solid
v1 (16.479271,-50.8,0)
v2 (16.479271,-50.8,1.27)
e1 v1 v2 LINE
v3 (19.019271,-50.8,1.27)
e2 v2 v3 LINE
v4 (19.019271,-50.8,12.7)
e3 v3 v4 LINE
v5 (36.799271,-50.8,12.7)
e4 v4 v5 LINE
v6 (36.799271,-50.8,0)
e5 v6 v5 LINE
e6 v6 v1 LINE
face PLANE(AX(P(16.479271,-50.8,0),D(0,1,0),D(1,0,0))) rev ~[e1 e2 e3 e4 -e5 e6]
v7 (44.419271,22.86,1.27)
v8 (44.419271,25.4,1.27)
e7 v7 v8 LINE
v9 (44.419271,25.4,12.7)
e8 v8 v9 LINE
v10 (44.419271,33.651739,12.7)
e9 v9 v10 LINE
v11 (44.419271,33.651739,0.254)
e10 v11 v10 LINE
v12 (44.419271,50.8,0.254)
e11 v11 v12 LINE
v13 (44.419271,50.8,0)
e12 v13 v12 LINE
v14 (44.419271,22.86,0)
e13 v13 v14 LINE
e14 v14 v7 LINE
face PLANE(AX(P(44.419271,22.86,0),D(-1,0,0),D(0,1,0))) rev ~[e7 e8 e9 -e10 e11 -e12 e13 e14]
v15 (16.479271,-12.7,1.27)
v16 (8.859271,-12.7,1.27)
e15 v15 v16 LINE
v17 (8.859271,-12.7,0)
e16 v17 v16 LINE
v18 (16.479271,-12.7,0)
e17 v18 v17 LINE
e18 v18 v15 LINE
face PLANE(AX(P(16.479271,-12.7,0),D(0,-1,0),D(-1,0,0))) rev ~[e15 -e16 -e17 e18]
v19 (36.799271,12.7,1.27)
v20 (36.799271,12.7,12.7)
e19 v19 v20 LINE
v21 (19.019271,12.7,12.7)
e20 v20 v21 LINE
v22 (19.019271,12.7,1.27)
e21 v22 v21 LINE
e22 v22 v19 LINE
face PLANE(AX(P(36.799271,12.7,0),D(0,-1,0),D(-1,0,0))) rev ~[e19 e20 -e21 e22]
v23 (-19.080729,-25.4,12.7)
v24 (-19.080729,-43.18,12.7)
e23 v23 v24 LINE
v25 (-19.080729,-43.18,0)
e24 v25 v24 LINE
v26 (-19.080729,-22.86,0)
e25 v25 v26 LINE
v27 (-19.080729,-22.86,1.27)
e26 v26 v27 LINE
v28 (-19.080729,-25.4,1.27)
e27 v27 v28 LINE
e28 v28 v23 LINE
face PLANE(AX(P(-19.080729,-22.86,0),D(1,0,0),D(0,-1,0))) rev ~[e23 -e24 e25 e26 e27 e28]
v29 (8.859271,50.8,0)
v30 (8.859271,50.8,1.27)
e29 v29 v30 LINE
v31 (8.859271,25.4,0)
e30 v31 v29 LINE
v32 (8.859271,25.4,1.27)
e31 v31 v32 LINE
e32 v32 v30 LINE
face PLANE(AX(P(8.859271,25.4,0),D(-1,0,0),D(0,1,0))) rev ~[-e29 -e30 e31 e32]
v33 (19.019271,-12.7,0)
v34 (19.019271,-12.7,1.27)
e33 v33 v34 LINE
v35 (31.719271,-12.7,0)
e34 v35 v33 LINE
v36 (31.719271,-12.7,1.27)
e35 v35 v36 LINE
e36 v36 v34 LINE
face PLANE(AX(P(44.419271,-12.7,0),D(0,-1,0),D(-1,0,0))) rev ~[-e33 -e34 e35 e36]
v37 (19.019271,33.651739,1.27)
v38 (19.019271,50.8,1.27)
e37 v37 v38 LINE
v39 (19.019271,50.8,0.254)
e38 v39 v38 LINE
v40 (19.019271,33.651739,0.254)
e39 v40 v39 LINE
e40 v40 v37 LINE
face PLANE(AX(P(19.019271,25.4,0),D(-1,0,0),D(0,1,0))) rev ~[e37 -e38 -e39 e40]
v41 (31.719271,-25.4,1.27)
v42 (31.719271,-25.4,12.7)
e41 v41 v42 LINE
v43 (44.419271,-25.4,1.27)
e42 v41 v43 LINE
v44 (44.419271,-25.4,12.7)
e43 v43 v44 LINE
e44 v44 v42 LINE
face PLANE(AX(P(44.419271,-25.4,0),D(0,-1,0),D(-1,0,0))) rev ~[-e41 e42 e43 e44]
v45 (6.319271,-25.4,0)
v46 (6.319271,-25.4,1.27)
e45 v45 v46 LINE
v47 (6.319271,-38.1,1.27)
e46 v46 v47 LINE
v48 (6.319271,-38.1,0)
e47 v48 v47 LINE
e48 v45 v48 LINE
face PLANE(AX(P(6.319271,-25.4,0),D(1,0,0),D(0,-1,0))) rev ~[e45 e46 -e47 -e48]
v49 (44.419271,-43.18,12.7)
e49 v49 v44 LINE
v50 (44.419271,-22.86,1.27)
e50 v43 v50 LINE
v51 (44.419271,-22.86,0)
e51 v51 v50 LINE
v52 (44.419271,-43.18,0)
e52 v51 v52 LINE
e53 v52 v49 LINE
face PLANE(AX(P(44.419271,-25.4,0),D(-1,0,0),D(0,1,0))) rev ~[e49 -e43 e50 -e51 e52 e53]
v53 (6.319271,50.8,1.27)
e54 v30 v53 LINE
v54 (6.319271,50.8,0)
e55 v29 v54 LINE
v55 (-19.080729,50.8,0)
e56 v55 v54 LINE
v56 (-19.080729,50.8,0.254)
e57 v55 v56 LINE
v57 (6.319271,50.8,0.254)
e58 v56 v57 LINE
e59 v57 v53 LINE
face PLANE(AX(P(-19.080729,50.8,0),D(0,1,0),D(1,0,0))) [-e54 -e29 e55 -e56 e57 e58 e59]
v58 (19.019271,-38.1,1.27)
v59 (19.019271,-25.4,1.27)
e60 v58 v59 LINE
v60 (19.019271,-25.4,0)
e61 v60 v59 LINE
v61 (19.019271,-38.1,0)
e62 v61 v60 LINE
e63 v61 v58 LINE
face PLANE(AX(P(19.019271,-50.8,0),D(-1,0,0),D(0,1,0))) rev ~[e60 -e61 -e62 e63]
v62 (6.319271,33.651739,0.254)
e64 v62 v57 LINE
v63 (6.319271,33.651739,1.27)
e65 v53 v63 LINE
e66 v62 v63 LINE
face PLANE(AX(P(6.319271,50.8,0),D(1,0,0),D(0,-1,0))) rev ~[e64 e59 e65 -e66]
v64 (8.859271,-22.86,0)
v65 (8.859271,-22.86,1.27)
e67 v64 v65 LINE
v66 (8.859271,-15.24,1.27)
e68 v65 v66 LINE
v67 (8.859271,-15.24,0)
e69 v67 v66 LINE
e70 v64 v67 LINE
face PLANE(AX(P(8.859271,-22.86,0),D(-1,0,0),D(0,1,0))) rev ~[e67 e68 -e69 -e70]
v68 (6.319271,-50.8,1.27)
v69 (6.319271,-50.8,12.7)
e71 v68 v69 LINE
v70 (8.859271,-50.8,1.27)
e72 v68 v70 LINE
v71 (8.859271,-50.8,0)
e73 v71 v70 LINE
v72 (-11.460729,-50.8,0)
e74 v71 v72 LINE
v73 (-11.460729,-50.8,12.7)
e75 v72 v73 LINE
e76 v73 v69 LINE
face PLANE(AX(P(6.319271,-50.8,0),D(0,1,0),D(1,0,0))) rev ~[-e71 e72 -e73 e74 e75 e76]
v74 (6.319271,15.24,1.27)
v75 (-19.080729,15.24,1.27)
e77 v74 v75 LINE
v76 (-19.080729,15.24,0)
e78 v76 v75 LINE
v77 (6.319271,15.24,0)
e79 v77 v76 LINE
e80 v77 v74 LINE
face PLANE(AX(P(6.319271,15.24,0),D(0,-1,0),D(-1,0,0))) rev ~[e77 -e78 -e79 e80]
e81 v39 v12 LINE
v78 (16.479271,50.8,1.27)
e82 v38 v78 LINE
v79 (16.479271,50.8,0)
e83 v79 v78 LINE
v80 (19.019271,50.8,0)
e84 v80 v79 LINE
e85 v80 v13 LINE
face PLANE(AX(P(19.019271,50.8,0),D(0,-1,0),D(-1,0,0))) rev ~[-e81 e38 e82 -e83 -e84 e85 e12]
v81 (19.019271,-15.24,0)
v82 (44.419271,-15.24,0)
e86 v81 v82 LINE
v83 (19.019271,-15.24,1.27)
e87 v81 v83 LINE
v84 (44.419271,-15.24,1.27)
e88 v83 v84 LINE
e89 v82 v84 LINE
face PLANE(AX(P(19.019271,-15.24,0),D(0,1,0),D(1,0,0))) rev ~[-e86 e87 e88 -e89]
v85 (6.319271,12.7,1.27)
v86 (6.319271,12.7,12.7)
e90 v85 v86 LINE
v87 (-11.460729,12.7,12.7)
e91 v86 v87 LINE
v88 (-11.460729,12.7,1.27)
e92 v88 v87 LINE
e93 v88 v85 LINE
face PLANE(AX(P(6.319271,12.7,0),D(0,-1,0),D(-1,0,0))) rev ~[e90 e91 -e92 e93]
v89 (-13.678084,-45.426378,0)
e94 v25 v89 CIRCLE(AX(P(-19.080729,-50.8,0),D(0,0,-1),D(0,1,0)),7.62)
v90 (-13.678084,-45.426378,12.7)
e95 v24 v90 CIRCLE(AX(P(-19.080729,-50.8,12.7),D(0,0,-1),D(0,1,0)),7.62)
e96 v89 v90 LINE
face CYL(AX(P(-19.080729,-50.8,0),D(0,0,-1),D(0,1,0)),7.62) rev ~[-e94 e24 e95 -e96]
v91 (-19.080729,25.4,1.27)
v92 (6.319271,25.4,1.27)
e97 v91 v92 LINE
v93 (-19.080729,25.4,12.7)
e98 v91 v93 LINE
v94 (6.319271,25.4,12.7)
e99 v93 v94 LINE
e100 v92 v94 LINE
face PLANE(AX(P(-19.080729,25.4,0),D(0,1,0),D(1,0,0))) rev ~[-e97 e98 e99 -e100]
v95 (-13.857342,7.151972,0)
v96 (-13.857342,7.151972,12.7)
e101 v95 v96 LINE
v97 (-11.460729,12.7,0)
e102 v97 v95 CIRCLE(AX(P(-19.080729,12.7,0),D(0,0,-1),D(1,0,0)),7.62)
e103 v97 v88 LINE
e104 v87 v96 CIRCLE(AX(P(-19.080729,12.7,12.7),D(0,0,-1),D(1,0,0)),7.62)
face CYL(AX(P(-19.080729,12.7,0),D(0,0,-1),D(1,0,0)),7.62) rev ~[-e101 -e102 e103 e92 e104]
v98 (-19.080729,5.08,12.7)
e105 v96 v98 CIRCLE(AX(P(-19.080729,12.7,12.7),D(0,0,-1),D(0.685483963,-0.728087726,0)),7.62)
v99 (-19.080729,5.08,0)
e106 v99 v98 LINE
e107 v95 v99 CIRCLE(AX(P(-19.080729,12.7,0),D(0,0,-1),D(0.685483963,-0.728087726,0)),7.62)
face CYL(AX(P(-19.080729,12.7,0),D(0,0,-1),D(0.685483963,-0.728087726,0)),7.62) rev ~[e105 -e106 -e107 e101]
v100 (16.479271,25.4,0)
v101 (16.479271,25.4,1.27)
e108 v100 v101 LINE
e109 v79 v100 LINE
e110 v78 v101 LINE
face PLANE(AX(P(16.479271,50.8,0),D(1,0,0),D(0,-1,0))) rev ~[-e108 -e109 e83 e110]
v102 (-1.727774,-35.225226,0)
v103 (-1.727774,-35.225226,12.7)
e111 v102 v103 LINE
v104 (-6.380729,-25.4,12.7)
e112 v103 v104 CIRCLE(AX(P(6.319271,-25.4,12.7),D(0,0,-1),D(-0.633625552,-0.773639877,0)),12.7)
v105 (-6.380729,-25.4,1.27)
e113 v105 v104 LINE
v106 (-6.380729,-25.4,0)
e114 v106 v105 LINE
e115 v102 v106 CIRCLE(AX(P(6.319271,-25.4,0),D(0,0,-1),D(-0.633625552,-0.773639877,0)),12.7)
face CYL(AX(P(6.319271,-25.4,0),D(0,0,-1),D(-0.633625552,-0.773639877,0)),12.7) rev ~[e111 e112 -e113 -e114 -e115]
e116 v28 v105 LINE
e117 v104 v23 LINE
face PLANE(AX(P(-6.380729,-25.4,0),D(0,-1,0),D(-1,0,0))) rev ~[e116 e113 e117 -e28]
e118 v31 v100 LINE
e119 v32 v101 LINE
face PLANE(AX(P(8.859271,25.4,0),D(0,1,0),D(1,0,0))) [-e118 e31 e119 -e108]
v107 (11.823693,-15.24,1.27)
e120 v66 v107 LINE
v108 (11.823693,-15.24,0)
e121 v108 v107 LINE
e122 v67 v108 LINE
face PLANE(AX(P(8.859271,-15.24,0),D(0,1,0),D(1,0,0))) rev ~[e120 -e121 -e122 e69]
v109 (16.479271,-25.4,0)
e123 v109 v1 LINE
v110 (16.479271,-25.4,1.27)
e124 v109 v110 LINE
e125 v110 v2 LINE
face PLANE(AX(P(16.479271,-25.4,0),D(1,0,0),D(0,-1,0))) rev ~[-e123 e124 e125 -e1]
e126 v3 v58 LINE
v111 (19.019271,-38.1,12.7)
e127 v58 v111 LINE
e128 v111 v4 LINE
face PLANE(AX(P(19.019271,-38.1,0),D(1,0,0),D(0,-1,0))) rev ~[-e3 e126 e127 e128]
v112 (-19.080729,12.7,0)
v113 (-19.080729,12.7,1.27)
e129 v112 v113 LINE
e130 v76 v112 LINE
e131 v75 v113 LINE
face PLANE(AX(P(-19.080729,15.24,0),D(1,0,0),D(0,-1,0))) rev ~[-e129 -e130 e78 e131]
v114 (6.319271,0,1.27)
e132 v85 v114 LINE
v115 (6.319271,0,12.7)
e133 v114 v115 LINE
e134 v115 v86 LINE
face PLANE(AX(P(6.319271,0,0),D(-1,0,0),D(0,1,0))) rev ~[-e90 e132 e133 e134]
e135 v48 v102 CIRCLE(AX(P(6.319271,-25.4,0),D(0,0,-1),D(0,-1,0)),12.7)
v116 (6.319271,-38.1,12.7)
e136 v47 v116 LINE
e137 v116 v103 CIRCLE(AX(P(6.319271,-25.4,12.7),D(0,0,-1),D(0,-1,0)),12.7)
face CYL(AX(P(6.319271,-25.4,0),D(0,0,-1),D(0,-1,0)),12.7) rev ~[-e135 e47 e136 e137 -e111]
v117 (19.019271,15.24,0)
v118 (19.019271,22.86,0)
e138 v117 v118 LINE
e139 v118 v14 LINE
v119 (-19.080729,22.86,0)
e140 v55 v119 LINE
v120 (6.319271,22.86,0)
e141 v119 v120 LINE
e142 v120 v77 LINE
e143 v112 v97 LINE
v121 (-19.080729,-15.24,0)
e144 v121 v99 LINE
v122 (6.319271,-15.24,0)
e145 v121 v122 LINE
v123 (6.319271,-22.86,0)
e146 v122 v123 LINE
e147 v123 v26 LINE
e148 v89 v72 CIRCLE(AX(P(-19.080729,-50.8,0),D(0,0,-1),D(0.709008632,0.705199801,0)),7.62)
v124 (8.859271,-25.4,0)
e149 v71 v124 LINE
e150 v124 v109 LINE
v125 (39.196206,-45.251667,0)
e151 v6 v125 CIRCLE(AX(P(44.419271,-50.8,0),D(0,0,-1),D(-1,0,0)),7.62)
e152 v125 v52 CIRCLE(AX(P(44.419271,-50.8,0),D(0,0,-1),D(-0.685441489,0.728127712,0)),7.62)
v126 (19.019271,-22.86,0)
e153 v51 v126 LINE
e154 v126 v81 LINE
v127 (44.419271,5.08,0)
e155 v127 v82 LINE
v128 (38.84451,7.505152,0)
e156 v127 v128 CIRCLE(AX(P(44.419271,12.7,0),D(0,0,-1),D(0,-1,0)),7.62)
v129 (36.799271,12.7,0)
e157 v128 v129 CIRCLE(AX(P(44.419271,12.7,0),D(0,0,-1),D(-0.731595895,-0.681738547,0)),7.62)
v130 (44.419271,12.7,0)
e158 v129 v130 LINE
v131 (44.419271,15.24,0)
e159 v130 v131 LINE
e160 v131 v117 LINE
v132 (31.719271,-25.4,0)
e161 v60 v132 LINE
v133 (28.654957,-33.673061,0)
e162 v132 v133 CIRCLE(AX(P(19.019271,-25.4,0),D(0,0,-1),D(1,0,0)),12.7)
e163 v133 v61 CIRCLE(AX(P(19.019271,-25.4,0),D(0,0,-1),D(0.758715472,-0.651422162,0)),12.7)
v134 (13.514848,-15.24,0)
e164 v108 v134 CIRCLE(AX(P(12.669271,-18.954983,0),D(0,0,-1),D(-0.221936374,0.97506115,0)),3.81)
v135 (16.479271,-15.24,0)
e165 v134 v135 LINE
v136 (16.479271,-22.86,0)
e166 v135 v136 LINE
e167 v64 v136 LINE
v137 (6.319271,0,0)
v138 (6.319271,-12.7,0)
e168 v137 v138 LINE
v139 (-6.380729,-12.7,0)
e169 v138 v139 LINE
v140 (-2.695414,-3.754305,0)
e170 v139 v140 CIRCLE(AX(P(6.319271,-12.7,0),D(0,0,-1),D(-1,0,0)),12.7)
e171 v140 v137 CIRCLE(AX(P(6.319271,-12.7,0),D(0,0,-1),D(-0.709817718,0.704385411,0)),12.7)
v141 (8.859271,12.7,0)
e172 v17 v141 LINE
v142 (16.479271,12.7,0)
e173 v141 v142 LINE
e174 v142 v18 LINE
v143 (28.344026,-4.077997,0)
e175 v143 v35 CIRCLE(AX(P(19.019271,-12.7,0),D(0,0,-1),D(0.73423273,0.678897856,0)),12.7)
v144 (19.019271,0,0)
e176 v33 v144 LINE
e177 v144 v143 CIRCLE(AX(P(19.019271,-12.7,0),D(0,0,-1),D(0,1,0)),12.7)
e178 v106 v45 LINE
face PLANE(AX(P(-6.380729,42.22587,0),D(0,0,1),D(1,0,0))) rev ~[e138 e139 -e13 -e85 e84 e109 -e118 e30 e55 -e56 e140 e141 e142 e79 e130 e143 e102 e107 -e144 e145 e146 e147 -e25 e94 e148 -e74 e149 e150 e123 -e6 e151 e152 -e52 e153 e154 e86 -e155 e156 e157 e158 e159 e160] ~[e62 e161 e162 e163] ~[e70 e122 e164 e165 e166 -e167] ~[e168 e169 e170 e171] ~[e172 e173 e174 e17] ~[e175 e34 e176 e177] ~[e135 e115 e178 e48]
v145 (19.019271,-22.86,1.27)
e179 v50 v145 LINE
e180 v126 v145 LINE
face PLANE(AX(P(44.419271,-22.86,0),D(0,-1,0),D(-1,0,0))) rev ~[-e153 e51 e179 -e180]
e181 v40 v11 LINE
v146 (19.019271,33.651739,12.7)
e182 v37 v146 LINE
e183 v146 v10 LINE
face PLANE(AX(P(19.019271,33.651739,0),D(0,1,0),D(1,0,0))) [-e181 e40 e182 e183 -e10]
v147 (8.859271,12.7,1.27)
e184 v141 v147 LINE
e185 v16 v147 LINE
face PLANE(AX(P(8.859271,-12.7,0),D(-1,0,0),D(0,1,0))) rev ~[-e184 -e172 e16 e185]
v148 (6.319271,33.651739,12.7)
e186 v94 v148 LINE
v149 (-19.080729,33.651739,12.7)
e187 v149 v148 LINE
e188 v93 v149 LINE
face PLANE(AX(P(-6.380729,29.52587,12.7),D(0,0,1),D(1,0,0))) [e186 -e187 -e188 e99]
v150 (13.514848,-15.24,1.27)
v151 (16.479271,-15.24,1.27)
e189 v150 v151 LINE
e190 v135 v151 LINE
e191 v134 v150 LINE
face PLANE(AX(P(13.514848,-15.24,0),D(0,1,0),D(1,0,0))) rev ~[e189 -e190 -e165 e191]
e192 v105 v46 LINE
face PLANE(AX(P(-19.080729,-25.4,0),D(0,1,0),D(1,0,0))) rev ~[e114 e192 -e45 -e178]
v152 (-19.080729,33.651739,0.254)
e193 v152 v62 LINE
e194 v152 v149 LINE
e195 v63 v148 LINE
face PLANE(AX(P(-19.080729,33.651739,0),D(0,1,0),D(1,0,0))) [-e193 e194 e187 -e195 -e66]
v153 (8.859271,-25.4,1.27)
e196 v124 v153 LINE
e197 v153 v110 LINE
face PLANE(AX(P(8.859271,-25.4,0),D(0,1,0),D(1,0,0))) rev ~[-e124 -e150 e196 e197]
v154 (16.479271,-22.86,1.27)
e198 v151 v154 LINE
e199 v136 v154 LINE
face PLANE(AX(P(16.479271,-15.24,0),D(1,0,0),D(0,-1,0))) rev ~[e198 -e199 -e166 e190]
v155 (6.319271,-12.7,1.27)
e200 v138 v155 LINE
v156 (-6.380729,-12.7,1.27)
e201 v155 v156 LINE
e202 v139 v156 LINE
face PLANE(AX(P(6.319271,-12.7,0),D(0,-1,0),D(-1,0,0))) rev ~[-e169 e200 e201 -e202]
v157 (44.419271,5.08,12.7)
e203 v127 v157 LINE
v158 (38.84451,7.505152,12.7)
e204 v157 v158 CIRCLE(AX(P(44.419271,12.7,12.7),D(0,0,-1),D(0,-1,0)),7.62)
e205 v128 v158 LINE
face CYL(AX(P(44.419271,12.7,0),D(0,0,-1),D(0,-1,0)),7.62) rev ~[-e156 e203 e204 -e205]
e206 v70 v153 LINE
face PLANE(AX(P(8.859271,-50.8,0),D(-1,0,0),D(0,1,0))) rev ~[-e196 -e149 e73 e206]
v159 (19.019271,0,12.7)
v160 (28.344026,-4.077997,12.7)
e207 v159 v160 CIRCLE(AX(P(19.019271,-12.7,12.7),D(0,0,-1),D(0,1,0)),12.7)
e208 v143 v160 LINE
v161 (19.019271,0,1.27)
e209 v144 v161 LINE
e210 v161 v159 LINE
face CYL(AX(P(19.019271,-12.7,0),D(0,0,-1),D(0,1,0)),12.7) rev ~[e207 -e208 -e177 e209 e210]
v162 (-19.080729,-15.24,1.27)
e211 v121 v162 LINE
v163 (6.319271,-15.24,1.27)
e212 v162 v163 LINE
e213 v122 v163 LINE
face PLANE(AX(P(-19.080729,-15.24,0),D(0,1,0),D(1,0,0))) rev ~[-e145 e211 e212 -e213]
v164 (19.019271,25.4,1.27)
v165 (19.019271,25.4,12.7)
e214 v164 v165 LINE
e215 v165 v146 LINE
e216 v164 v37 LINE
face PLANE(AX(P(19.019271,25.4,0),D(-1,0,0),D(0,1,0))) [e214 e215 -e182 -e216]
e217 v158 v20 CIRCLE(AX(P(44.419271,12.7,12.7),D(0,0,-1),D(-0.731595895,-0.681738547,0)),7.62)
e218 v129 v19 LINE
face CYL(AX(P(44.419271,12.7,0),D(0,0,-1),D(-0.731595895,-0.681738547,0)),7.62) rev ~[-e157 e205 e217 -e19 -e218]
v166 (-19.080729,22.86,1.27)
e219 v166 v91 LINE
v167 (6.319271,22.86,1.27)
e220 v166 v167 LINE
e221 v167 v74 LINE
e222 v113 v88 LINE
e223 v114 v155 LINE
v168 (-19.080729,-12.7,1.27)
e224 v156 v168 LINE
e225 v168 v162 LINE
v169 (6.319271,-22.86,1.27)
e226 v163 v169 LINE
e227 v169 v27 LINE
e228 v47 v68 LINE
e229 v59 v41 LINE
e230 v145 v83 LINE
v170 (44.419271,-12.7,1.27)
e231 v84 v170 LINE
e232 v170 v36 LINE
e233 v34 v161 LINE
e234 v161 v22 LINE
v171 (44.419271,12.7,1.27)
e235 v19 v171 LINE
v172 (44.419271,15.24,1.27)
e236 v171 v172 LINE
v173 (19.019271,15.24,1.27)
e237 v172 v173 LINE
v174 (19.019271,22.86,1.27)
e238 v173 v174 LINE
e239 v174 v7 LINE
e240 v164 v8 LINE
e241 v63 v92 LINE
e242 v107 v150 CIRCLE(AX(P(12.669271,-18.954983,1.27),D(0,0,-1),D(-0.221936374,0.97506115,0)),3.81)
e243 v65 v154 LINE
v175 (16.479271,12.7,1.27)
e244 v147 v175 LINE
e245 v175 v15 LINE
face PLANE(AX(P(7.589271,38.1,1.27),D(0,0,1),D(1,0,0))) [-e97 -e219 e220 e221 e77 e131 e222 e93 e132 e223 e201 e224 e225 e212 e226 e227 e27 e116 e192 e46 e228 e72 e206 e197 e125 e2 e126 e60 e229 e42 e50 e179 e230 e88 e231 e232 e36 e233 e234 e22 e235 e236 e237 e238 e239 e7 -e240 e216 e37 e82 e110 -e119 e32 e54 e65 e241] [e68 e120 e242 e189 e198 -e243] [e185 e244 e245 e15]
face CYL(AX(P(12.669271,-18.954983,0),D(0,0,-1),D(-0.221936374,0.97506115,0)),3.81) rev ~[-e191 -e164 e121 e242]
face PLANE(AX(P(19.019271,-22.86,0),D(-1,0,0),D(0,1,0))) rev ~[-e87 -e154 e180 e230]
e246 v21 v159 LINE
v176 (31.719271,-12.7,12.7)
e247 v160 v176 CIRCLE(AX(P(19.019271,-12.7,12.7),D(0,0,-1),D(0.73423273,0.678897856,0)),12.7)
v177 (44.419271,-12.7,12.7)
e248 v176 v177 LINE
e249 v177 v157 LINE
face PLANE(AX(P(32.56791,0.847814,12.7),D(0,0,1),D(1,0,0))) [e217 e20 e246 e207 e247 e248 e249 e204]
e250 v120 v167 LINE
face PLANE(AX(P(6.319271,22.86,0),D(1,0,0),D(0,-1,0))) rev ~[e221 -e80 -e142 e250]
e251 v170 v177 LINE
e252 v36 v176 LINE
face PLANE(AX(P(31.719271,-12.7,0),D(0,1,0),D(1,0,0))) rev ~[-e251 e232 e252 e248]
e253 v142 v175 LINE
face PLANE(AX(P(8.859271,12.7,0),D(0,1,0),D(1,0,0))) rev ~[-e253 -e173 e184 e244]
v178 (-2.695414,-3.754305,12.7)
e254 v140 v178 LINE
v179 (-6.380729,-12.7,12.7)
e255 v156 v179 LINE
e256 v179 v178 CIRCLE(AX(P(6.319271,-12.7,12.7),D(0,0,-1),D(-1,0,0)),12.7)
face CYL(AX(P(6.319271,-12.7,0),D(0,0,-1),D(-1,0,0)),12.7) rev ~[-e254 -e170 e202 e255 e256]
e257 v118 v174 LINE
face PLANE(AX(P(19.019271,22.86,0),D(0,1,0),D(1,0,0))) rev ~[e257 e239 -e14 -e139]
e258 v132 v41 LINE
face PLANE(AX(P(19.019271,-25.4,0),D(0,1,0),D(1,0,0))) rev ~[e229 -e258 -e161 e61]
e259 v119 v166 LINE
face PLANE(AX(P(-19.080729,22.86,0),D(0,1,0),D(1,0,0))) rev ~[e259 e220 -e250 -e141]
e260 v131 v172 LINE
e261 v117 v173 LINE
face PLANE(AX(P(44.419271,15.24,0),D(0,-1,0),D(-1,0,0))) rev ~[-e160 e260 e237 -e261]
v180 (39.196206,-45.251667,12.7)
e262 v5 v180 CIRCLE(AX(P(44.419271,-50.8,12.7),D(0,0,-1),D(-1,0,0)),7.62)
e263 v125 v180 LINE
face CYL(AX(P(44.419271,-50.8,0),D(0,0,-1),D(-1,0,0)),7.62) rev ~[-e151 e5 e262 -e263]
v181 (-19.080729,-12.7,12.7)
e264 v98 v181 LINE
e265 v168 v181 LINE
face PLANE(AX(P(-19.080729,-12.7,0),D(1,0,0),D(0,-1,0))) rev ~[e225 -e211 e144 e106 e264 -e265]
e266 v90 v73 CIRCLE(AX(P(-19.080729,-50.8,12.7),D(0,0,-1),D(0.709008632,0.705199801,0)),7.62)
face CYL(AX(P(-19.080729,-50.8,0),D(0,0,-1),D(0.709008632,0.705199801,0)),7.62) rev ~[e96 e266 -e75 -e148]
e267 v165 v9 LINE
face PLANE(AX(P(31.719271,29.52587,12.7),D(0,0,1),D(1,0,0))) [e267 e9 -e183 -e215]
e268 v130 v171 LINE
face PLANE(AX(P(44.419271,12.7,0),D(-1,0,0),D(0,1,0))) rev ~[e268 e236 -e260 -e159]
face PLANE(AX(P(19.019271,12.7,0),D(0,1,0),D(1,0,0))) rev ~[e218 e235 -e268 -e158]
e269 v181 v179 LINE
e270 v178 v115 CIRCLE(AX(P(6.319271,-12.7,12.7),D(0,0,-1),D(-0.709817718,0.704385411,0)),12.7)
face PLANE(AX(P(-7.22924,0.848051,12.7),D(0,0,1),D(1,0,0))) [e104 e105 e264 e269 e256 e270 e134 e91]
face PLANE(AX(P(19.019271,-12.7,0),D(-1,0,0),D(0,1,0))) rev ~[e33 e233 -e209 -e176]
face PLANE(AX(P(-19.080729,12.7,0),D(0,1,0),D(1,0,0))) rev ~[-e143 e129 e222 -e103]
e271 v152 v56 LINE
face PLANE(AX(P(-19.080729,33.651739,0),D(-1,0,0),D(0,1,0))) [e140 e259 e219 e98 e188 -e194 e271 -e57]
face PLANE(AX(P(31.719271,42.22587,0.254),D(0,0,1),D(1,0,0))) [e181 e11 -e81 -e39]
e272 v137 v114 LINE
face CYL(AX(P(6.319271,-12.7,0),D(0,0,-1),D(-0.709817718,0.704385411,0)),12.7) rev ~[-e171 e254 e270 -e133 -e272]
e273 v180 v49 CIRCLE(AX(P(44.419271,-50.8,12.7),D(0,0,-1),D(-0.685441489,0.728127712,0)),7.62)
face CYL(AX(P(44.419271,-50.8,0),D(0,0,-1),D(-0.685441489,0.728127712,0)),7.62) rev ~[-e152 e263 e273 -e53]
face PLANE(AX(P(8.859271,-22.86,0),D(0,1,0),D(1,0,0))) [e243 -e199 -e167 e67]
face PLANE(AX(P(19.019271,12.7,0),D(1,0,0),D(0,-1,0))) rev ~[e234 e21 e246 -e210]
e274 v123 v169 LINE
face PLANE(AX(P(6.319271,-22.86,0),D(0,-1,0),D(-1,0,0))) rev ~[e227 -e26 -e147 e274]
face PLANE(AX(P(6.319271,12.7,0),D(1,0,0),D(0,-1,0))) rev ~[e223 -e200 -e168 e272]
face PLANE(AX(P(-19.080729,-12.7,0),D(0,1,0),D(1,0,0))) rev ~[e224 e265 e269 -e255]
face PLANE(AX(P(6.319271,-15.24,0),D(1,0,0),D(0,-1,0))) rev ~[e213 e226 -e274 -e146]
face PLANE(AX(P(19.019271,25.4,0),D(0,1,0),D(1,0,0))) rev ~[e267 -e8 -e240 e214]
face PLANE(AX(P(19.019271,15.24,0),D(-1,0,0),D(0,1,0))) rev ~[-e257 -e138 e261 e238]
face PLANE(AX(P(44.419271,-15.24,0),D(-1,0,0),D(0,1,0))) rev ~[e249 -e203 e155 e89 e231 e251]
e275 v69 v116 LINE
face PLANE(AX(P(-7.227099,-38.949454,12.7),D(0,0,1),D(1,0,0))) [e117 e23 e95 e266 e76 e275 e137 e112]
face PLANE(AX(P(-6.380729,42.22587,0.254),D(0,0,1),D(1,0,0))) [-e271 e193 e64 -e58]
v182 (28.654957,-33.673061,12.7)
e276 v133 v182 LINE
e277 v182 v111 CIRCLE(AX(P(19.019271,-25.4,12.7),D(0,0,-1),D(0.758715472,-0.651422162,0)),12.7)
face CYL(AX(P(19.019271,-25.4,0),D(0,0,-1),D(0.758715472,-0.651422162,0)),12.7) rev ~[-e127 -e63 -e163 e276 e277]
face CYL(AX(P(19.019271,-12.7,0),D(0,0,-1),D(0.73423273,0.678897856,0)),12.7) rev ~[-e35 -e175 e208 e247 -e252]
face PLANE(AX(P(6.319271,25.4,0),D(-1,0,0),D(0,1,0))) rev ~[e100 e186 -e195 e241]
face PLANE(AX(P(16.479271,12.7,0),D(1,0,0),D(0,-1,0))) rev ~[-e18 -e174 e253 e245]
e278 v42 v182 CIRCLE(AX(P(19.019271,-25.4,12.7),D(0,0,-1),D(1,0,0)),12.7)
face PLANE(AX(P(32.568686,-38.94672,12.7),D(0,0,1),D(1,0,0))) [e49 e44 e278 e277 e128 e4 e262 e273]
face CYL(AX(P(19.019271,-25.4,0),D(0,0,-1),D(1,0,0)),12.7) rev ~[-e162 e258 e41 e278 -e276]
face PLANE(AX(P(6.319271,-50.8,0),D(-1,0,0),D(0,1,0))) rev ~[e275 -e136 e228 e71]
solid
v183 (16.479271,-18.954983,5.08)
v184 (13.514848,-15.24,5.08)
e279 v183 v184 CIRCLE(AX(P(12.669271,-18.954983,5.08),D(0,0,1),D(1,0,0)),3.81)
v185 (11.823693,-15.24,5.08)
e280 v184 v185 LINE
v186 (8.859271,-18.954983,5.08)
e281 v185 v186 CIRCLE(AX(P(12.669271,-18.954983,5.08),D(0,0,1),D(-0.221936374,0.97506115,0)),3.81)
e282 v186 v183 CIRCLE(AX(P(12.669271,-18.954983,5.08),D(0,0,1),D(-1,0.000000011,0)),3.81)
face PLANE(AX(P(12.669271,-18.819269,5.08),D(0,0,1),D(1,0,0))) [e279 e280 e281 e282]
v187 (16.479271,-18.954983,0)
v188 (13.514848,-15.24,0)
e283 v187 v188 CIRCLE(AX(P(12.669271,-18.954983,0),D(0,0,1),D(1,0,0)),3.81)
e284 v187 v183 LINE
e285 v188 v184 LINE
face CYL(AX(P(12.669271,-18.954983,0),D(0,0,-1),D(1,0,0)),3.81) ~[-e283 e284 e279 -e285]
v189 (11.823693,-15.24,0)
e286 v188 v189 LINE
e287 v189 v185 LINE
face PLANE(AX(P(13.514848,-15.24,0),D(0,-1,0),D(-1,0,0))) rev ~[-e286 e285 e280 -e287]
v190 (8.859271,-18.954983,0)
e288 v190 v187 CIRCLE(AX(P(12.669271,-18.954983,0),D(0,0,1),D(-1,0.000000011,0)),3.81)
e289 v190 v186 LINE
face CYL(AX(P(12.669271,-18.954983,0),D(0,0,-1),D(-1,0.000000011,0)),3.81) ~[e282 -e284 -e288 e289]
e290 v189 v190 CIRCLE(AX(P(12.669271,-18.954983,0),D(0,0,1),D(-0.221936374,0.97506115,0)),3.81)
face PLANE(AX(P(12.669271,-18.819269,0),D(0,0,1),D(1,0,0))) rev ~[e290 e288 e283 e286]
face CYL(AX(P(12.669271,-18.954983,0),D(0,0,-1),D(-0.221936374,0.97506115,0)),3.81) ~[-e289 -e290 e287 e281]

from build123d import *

# Parameters (mm, degrees)
F1_DEPTH = 5.08
F0_W     = 7.62
F0_H     = 7.62
F0_H_2   = 2.54
F0_W_2   = 2.54
F0_W_3   = 25.4
F2_DEPTH = 1.27
F0_H_3   = 8.2517393589
F3_DEPTH = 12.7
F0_H_4   = 17.1482606411
F4_DEPTH = 0.254


with BuildPart() as f1:
    # F0 (on Top) → F1 (new body)
    with BuildSketch(Plane.XY):
        with BuildLine():
            ThreePointArc((11.8236929674, -15.24), (9.6912048674, -16.5785939593), (8.8592705512, -18.954982938))
            ThreePointArc((8.8592705512, -18.954982938), (12.6692705296, -22.7649829811), (16.4792705512, -18.9549829811))
            ThreePointArc((16.4792705512, -18.9549829811), (15.6473362485, -16.5785939761), (13.514848135, -15.24))
            Line((13.514848135, -15.24), (11.8236929674, -15.24))
        make_face()
    extrude(amount=F1_DEPTH)


with BuildPart() as f2:
    # F0 (on Top) → F2 (new body)
    with BuildSketch(Plane.XY):
        Polygon((8.8592705512, 50.8), (6.3192705512, 50.8), (6.3192705512, 33.6517393589), (6.3192705512, 25.4), (8.8592705512, 25.4), align=None)
        Polygon((16.4792705512, 50.8), (16.4792705512, 25.4), (19.0192705512, 25.4), (19.0192705512, 33.6517393589), (19.0192705512, 50.8), align=None)
        with Locations((12.6692705512, 19.05)):
            Rectangle(F0_W, F0_H)
        with Locations((12.6692705512, 24.13)):
            Rectangle(F0_W, F0_H_2)
        with Locations((7.5892705512, 24.13)):
            Rectangle(F0_W_2, F0_H_2)
        with Locations((-6.3807294488, 24.13)):
            Rectangle(F0_W_3, F0_H_2)
        with Locations((7.5892705512, 19.05)):
            Rectangle(F0_W_2, F0_H)
        with Locations((17.7492705512, 19.05)):
            Rectangle(F0_W_2, F0_H)
        with Locations((31.7192705512, 24.13)):
            Rectangle(F0_W_3, F0_H_2)
        with Locations((17.7492705512, 24.13)):
            Rectangle(F0_W_2, F0_H_2)
        Polygon((44.4192705512, 15.24), (19.0192705512, 15.24), (19.0192705512, 12.7), (36.7992705512, 12.7), (44.4192705512, 12.7), align=None)
        with Locations((17.7492705512, 13.97)):
            Rectangle(F0_W_2, F0_H_2)
        with Locations((7.5892705512, 13.97)):
            Rectangle(F0_W_2, F0_H_2)
        Polygon((6.3192705512, 12.7), (6.3192705512, 15.24), (-19.0807294488, 15.24), (-19.0807294488, 12.7), (-11.4607294488, 12.7), align=None)
        with Locations((12.6692705512, 13.97)):
            Rectangle(F0_W, F0_H_2)
        Polygon((8.8592705512, 12.7), (6.3192705512, 12.7), (6.3192705512, 0), (6.3192705512, -12.7), (8.8592705512, -12.7), align=None)
        Polygon((19.0192705512, 12.7), (16.4792705512, 12.7), (16.4792705512, -12.7), (19.0192705512, -12.7), (19.0192705512, 0), align=None)
        Polygon((6.3192705512, -15.24), (6.3192705512, -12.7), (-6.3807294488, -12.7), (-19.0807294488, -12.7), (-19.0807294488, -15.24), align=None)
        with Locations((7.5892705512, -13.97)):
            Rectangle(F0_W_2, F0_H_2)
        with BuildLine():
            Line((16.4792705512, -12.7), (8.8592705512, -12.7))
            Line((8.8592705512, -12.7), (8.8592705512, -15.24))
            Line((8.8592705512, -15.24), (11.8236929674, -15.24))
            ThreePointArc((11.8236929674, -15.24), (12.6692705512, -15.1449829811), (13.514848135, -15.24))
            Line((13.514848135, -15.24), (16.4792705512, -15.24))
            Line((16.4792705512, -15.24), (16.4792705512, -12.7))
        make_face()
        with Locations((17.7492705512, -13.97)):
            Rectangle(F0_W_2, F0_H_2)
        Polygon((31.7192705512, -12.7), (19.0192705512, -12.7), (19.0192705512, -15.24), (44.4192705512, -15.24), (44.4192705512, -12.7), align=None)
        Polygon((19.0192705512, -15.24), (16.4792705512, -15.24), (16.4792705512, -18.9549829811), (16.4792705512, -22.86), (19.0192705512, -22.86), align=None)
        Polygon((8.8592705512, -18.954982938), (8.8592705512, -15.24), (6.3192705512, -15.24), (6.3192705512, -22.86), (8.8592705512, -22.86), align=None)
        with Locations((12.6692705512, -24.13)):
            Rectangle(F0_W, F0_H_2)
        with Locations((7.5892705512, -24.13)):
            Rectangle(F0_W_2, F0_H_2)
        Polygon((6.3192705512, -25.4), (6.3192705512, -22.86), (-19.0807294488, -22.86), (-19.0807294488, -25.4), (-6.3807294488, -25.4), align=None)
        Polygon((44.4192705512, -22.86), (19.0192705512, -22.86), (19.0192705512, -25.4), (31.7192705512, -25.4), (44.4192705512, -25.4), align=None)
        with Locations((17.7492705512, -24.13)):
            Rectangle(F0_W_2, F0_H_2)
        Polygon((19.0192705512, -25.4), (16.4792705512, -25.4), (16.4792705512, -50.8), (19.0192705512, -50.8), (19.0192705512, -38.1), align=None)
        Polygon((8.8592705512, -25.4), (6.3192705512, -25.4), (6.3192705512, -38.1), (6.3192705512, -50.8), (8.8592705512, -50.8), align=None)
    extrude(amount=F2_DEPTH)

    # F0 (on Top) → F3 (join)
    with BuildSketch(Plane.XY):
        with Locations((-6.3807294488, 29.5258696795)):
            Rectangle(F0_W_3, F0_H_3)
        with Locations((31.7192705512, 29.5258696795)):
            Rectangle(F0_W_3, F0_H_3)
        with BuildLine():
            Line((6.3192705512, 0), (6.3192705512, 12.7))
            Line((6.3192705512, 12.7), (-11.4607294488, 12.7))
            ThreePointArc((-11.4607294488, 12.7), (-12.0854948202, 9.6782302386), (-13.8573416512, 7.151971529))
            ThreePointArc((-13.8573416512, 7.151971529), (-16.2710654964, 5.6169082687), (-19.0807294488, 5.08))
            Line((-19.0807294488, 5.08), (-19.0807294488, -12.7))
            Line((-19.0807294488, -12.7), (-6.3807294488, -12.7))
            ThreePointArc((-6.3807294488, -12.7), (-5.4233122083, -7.8624644563), (-2.6954144666, -3.7543052797))
            ThreePointArc((-2.6954144666, -3.7543052797), (1.4366648405, -0.9760859149), (6.3192705512, 0))
        make_face()
        with BuildLine():
            Line((36.7992705512, 12.7), (19.0192705512, 12.7))
            Line((19.0192705512, 12.7), (19.0192705512, 0))
            ThreePointArc((19.0192705512, 0), (24.108011302, -1.0640764195), (28.34402622, -4.0779972329))
            ThreePointArc((28.34402622, -4.0779972329), (30.8453941129, -8.0704426234), (31.7192705512, -12.7))
            Line((31.7192705512, -12.7), (44.4192705512, -12.7))
            Line((44.4192705512, -12.7), (44.4192705512, 5.08))
            ThreePointArc((44.4192705512, 5.08), (41.3795616585, 5.7125419609), (38.8445098324, 7.505152271))
            ThreePointArc((38.8445098324, 7.505152271), (37.3289928177, 9.9085198082), (36.7992705512, 12.7))
        make_face()
        with BuildLine():
            Line((44.4192705512, -25.4), (31.7192705512, -25.4))
            ThreePointArc((31.7192705512, -25.4), (30.9285782234, -29.8111665996), (28.6549570442, -33.6730614532))
            ThreePointArc((28.6549570442, -33.6730614532), (24.3212569499, -36.9403180298), (19.0192705512, -38.1))
            Line((19.0192705512, -38.1), (19.0192705512, -50.8))
            Line((19.0192705512, -50.8), (36.7992705512, -50.8))
            ThreePointArc((36.7992705512, -50.8), (37.4241240621, -47.7780262087), (39.1962064031, -45.2516668355))
            ThreePointArc((39.1962064031, -45.2516668355), (41.6098131938, -43.7168263217), (44.4192705512, -43.18))
            Line((44.4192705512, -43.18), (44.4192705512, -25.4))
        make_face()
        with BuildLine():
            ThreePointArc((-1.7277739655, -35.2252264374), (-5.1586967201, -30.8356478288), (-6.3807294488, -25.4))
            Line((-6.3807294488, -25.4), (-19.0807294488, -25.4))
            Line((-19.0807294488, -25.4), (-19.0807294488, -43.18))
            ThreePointArc((-19.0807294488, -43.18), (-16.155204139, -43.7639711725), (-13.6780836704, -45.4263775167))
            ThreePointArc((-13.6780836704, -45.4263775167), (-12.0368469671, -47.8934350886), (-11.4607294488, -50.8))
            Line((-11.4607294488, -50.8), (6.3192705512, -50.8))
            Line((6.3192705512, -50.8), (6.3192705512, -38.1))
            ThreePointArc((6.3192705512, -38.1), (2.0467054993, -37.3597319317), (-1.7277739655, -35.2252264374))
        make_face()
    extrude(amount=F3_DEPTH)

    # F0 (on Top) → F4 (join)
    with BuildSketch(Plane.XY):
        with Locations((-6.3807294488, 42.2258696795)):
            Rectangle(F0_W_3, F0_H_4)
        with Locations((31.7192705512, 42.2258696795)):
            Rectangle(F0_W_3, F0_H_4)
    extrude(amount=F4_DEPTH)


solid = Compound([f1.part, f2.part])
